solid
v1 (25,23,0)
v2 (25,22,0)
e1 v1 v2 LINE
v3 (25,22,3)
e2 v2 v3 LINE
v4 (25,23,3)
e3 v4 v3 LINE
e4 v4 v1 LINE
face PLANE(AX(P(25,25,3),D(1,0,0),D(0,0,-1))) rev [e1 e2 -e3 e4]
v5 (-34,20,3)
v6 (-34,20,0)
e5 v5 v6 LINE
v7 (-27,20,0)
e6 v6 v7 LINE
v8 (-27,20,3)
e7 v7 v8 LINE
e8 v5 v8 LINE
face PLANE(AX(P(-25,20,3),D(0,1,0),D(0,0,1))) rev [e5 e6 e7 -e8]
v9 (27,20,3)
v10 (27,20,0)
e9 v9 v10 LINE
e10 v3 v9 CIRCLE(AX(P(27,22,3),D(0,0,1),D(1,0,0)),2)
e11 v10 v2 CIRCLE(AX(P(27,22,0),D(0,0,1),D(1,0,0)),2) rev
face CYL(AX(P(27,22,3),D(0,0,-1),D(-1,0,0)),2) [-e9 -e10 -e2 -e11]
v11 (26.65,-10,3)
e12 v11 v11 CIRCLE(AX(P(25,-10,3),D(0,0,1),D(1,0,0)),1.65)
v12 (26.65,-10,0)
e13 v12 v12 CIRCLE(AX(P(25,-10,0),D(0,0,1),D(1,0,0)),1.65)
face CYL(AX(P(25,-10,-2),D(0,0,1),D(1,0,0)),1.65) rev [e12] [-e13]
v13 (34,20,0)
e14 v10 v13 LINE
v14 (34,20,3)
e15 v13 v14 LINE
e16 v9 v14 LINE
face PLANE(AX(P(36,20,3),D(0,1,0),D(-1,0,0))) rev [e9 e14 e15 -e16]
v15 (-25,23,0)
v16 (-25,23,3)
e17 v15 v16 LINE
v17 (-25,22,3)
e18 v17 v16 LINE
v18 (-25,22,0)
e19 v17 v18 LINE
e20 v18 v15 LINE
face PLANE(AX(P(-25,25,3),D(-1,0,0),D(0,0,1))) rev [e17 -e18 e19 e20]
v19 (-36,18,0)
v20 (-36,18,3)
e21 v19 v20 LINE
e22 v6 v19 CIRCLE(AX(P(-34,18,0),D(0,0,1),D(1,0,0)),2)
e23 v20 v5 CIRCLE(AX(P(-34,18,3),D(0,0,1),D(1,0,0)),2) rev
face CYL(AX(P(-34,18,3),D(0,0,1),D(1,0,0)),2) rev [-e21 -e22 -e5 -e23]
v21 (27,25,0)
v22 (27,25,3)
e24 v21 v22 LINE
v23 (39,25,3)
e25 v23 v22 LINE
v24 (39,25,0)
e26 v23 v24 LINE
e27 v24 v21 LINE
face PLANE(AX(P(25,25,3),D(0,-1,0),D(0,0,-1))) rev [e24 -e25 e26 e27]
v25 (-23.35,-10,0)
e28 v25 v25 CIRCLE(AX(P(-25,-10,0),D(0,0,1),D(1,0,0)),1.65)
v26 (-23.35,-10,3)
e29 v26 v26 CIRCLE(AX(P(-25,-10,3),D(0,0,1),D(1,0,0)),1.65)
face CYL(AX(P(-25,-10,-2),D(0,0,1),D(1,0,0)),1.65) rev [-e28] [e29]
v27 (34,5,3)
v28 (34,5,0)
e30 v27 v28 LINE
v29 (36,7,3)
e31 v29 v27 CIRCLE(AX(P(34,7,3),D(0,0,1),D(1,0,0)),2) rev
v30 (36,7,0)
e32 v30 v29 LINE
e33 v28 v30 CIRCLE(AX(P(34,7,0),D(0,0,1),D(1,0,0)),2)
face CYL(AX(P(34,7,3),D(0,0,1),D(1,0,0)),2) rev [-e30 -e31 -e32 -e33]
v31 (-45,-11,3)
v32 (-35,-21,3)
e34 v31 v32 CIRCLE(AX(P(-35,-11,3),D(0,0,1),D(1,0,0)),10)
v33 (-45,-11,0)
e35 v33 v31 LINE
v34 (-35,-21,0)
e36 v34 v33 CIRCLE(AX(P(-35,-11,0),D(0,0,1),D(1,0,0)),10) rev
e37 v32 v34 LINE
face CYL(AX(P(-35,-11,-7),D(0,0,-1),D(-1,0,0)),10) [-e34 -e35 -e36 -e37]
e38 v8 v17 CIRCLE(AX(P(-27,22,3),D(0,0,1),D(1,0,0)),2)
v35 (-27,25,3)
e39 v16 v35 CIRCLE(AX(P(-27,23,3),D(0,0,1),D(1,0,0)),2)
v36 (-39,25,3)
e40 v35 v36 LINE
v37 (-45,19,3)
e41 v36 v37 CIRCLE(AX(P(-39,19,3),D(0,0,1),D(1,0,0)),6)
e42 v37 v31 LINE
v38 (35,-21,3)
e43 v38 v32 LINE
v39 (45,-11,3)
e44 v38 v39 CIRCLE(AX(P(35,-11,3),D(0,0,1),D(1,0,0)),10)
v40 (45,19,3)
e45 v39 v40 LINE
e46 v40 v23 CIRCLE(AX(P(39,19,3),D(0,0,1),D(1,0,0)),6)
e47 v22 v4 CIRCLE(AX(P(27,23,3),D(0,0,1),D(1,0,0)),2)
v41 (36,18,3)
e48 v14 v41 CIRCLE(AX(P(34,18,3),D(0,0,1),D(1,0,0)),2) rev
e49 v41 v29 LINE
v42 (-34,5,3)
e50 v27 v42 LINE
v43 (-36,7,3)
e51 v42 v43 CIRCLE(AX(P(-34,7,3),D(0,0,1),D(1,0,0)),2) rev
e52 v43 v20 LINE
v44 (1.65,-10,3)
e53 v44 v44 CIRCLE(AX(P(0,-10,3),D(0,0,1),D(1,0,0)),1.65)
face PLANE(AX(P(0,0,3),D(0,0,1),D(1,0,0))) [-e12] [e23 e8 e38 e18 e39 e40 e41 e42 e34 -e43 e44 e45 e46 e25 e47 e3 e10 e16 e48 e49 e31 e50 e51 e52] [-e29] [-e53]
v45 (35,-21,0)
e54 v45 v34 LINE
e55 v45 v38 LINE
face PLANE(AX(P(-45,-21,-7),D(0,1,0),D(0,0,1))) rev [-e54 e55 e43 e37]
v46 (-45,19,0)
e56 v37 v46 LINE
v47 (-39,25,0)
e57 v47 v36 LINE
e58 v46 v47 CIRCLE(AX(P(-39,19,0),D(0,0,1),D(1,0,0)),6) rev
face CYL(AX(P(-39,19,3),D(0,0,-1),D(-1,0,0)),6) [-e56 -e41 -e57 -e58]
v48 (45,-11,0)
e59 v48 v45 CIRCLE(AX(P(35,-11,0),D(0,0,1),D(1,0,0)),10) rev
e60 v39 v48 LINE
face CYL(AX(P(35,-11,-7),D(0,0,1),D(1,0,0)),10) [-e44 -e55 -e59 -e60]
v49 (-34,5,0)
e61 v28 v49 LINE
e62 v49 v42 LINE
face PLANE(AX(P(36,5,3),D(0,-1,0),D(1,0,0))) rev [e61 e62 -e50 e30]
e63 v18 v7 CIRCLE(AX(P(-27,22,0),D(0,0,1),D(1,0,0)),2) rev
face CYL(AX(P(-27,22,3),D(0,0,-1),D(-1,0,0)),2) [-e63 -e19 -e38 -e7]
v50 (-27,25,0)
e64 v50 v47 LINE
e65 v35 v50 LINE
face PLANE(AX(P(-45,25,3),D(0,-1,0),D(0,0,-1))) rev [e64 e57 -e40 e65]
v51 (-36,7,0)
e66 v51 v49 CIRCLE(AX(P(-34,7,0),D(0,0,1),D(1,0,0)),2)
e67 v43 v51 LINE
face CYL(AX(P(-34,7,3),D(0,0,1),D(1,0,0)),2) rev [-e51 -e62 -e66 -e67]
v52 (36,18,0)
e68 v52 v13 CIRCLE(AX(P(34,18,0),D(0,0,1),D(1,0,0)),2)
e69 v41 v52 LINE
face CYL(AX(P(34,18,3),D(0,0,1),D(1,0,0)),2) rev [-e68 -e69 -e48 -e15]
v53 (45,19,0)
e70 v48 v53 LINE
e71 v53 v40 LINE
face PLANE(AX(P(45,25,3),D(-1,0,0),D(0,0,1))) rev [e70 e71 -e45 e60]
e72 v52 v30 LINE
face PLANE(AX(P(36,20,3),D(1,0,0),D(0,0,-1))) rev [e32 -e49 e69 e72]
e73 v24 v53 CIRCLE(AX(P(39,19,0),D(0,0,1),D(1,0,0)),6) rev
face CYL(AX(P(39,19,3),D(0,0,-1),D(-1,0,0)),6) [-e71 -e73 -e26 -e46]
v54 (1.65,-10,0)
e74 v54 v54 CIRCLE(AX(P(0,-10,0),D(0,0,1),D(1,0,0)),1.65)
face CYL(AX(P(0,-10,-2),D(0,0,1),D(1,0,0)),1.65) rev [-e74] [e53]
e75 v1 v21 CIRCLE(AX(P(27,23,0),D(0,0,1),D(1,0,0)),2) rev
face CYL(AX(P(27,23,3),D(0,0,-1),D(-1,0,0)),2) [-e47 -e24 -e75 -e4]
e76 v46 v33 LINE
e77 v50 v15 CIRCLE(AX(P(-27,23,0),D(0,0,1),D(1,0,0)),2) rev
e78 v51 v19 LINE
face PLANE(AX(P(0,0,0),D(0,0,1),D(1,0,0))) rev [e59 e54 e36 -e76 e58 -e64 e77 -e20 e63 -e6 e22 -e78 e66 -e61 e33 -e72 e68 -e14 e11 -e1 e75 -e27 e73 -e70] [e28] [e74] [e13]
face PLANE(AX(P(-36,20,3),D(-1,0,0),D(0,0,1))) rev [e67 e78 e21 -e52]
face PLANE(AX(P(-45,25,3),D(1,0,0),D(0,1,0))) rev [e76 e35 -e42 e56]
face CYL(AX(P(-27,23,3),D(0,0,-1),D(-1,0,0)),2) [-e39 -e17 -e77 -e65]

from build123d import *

# Parameters (mm, degrees)
EXTRUDE_1_DEPTH     = 3
FILLET_1_R          = 6
FILLET_2_R          = 2
SKETCH_2_R          = 1.65
CUT_EXTRUDE_1_DEPTH = 5
FILLET_3_R          = 10
SKETCH_3_W          = 90
SKETCH_3_H          = 4
CUT_EXTRUDE_2_DEPTH = 10
FILLET_4_R          = 10


with BuildPart() as part:
    # 草图1 → 凸台-拉伸1 (new body)
    with BuildSketch(Plane.XY):
        Polygon((25, 25), (45, 25), (45, -25), (-45, -25), (-45, 25), (-25, 25), (-25, 20), (-36, 20), (-36, 5), (36, 5), (36, 20), (25, 20), align=None)
    extrude(amount=EXTRUDE_1_DEPTH)

    # 圆角1
    fillet_1_edges = [part.edges().sort_by_distance(p)[0] for p in [
        (-45, 25, 1.5),
        (45, 25, 1.5),
    ]]
    fillet(fillet_1_edges, radius=FILLET_1_R)

    # 圆角2
    fillet_2_edges = [part.edges().sort_by_distance(p)[0] for p in [
        (-25, 25, 1.5),
        (-25, 20, 1.5),
        (-36, 20, 1.5),
        (-36, 5, 1.5),
        (36, 5, 1.5),
        (36, 20, 1.5),
        (25, 20, 1.5),
        (25, 25, 1.5),
    ]]
    fillet(fillet_2_edges, radius=FILLET_2_R)

    # 草图2 → 切除-拉伸1 (cut)
    with BuildSketch(Plane.XY.offset(3)):
        with Locations((-25, -10)):
            Circle(SKETCH_2_R)
        with Locations((25, -10)):
            Circle(SKETCH_2_R)
        with Locations((0, -10)):
            Circle(SKETCH_2_R)
    extrude(amount=-CUT_EXTRUDE_1_DEPTH, mode=Mode.SUBTRACT)

    # 圆角3
    fillet_3_edges = [part.edges().sort_by_distance(p)[0] for p in [
        (45, -25, 1.5),
        (-45, -25, 1.5),
    ]]
    fillet(fillet_3_edges, radius=FILLET_3_R)

    # 草图3 → 切除-拉伸2 (cut)
    with BuildSketch(Plane.XY.offset(3)):
        with Locations((0, -23)):
            Rectangle(SKETCH_3_W, SKETCH_3_H)
    extrude(amount=-CUT_EXTRUDE_2_DEPTH, mode=Mode.SUBTRACT)

    # 圆角4
    fillet_4_edges = [part.edges().sort_by_distance(p)[0] for p in [
        (43, -21, 1.5),
    ]]
    fillet(fillet_4_edges, radius=FILLET_4_R)
    fillet_4_2_edges = [part.edges().sort_by_distance(p)[0] for p in [
        (-43, -21, 1.5),
    ]]
    fillet(fillet_4_2_edges, radius=FILLET_4_R)


solid = part.part
